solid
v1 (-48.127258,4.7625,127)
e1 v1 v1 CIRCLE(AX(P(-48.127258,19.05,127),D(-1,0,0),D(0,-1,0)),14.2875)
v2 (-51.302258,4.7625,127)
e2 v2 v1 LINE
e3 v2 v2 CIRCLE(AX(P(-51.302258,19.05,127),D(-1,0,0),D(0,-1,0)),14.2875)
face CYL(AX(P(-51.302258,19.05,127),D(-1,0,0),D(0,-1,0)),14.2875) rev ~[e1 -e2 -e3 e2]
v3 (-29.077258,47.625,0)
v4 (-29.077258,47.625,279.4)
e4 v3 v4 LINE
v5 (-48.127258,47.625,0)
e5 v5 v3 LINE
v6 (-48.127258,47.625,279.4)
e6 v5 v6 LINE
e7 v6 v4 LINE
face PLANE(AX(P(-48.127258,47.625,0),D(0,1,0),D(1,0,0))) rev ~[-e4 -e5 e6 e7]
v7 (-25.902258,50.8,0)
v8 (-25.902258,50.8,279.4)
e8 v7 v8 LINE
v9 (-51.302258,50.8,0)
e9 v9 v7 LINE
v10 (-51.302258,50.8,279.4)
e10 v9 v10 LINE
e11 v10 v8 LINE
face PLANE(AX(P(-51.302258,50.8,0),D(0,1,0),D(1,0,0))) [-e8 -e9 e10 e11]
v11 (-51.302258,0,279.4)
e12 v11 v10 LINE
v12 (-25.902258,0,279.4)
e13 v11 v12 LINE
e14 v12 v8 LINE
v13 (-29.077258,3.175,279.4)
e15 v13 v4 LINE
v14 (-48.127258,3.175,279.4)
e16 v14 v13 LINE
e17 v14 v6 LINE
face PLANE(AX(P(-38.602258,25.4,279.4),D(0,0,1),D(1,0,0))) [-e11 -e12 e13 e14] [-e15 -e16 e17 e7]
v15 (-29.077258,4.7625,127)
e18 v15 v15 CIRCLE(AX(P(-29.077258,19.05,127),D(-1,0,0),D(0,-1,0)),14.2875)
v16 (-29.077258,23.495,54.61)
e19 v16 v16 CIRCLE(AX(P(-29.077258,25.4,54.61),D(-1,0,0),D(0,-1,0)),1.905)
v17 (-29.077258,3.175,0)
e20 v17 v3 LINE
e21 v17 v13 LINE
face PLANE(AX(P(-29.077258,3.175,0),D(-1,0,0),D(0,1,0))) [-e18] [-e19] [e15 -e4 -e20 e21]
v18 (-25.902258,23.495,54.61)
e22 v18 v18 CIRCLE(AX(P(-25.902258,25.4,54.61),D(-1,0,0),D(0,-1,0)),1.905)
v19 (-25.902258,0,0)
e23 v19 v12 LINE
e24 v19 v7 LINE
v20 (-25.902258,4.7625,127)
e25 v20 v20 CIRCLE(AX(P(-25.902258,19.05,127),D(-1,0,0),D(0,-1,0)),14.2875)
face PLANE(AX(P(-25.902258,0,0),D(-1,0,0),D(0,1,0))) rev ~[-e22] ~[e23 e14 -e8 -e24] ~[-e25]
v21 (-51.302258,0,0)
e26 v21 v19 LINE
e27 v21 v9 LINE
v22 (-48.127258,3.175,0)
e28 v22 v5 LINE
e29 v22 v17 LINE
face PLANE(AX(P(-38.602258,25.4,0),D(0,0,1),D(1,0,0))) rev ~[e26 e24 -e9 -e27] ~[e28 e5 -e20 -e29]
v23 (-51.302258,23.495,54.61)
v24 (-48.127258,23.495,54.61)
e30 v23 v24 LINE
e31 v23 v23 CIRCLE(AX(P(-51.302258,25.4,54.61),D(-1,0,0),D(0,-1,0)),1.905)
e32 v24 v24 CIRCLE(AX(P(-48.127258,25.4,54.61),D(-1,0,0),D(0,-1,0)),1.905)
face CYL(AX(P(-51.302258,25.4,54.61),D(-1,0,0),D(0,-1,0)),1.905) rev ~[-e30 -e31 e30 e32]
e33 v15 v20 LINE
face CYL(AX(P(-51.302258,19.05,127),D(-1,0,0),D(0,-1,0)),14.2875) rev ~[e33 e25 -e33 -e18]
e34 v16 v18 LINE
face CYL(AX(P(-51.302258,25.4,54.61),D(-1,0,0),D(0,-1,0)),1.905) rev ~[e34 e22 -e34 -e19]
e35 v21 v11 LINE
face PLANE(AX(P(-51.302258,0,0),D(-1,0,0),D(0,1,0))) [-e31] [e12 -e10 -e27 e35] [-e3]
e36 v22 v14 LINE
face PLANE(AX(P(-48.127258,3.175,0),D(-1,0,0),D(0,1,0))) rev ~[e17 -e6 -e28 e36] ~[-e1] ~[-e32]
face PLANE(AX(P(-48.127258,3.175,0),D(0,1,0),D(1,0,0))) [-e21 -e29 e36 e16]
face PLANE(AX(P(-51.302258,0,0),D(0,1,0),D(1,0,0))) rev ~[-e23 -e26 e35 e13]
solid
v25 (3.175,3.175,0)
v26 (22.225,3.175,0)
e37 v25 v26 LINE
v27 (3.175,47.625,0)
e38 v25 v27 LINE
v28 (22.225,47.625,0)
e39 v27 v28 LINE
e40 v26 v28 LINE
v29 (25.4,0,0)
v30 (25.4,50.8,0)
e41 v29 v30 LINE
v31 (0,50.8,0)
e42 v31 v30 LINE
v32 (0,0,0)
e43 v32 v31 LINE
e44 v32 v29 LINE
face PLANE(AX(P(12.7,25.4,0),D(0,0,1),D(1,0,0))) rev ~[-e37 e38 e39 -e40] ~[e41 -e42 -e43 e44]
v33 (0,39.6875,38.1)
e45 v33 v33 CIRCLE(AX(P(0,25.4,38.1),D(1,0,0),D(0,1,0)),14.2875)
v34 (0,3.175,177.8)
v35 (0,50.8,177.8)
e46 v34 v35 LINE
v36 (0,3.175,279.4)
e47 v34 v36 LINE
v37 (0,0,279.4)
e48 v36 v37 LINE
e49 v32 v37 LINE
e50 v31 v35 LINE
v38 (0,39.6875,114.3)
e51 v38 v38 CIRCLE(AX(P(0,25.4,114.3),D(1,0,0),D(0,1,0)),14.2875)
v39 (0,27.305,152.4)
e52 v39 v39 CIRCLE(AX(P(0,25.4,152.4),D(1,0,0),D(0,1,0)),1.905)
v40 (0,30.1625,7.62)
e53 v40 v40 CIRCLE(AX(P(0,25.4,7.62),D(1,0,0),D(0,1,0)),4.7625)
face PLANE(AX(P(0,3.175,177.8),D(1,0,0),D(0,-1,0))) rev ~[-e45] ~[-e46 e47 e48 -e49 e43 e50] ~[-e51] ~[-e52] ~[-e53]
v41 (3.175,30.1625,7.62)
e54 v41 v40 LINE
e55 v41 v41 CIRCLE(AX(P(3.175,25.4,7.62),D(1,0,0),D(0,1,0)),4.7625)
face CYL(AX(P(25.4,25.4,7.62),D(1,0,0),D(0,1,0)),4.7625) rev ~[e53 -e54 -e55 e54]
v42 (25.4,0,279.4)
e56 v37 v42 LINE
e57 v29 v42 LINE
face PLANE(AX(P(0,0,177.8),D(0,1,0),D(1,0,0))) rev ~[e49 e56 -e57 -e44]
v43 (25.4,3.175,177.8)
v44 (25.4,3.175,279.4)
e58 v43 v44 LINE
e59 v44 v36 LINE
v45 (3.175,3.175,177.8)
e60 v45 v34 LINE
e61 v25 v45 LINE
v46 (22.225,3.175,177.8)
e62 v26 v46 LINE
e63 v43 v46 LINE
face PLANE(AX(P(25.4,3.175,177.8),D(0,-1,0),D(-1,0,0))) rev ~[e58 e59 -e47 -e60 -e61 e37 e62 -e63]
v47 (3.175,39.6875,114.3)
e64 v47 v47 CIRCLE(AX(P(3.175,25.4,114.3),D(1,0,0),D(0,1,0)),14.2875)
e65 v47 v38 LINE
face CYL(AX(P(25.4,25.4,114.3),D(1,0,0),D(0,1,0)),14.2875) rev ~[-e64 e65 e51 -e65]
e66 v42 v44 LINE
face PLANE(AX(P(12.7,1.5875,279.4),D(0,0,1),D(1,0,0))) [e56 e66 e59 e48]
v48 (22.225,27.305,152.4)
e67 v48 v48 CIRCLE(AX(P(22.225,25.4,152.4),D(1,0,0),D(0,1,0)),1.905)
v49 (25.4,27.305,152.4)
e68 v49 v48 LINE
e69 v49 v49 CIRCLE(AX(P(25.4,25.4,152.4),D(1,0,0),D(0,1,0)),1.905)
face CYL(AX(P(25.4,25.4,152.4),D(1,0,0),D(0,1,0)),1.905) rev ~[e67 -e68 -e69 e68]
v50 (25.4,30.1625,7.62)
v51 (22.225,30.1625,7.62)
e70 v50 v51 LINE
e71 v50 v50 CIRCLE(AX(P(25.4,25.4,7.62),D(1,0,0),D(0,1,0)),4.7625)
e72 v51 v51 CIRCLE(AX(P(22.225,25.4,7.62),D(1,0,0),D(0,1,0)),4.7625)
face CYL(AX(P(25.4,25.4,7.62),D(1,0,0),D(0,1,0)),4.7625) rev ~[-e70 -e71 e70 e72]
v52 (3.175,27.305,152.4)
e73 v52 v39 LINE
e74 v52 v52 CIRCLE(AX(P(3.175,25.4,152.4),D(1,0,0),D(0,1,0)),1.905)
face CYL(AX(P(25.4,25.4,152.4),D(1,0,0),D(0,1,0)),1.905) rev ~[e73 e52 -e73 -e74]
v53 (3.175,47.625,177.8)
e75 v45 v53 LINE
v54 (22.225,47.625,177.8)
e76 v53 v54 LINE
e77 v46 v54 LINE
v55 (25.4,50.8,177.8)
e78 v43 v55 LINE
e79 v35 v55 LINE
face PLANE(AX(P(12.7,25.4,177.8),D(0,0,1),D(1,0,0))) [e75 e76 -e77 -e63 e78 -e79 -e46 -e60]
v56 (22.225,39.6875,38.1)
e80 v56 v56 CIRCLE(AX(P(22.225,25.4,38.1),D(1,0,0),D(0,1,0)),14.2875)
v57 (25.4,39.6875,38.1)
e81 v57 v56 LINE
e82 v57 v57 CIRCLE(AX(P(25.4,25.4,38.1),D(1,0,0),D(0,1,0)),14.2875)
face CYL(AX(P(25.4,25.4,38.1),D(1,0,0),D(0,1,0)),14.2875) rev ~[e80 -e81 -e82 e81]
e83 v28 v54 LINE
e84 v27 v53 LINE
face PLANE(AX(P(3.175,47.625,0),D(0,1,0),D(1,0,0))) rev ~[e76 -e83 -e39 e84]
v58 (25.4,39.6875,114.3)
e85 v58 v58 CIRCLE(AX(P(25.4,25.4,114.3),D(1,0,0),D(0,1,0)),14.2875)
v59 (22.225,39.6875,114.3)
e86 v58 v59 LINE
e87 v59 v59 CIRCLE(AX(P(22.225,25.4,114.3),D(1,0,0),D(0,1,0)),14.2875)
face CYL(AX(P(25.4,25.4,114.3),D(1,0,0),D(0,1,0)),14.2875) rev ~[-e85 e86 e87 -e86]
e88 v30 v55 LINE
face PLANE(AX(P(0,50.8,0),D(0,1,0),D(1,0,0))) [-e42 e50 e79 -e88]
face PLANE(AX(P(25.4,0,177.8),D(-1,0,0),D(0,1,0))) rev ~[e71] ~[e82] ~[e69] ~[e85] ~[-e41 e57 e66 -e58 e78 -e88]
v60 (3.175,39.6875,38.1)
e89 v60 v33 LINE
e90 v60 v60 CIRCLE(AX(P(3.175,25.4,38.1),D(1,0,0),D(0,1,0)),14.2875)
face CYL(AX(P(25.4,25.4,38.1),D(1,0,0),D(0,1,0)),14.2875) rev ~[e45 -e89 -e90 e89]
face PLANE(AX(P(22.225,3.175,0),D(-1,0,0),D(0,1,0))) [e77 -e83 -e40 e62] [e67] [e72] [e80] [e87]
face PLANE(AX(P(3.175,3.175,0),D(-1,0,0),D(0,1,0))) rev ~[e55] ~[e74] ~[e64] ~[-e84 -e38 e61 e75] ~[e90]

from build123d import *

# Parameters (mm, degrees)
F0_W      = 25.4
F0_H      = 50.8
F0_W_2    = 19.05
F0_H_2    = 44.45
F1_DEPTH  = 177.8
F2_R      = 1.905
F2_R_2    = 14.2875
F2_R_3    = 4.7625
F3_DEPTH  = 25.4
F4_W      = 25.4
F4_H      = 50.8
F4_W_2    = 19.05
F4_H_2    = 44.45
F5_DEPTH  = 279.4
F6_R      = 1.905
F7_DEPTH  = 25.4
F8_R      = 14.2875
F9_DEPTH  = 25.4
F11_DEPTH = 101.6


# Not quite as in the source:
# - a feature names something its author has since deleted; it is built from what else it names


with BuildPart() as f1:
    # F0 (on Top) → F1 (new body)
    with BuildSketch(Plane.XY):
        with Locations((12.7, 25.4)):
            Rectangle(F0_W, F0_H)
        with Locations((12.7, 25.4)):
            Rectangle(F0_W_2, F0_H_2, mode=Mode.SUBTRACT)
    extrude(amount=F1_DEPTH)

    # F2 (on face) → F3 (cut, through all)
    with BuildSketch(Plane.YZ.offset(25.4)):
        with Locations((25.4, 152.4)):
            Circle(F2_R)
        with Locations((25.4, 38.1)):
            Circle(F2_R_2)
        with Locations((25.4, 7.62)):
            Circle(F2_R_3)
        with Locations((25.4, 114.3)):
            Circle(F2_R_2)
    extrude(amount=-F3_DEPTH, mode=Mode.SUBTRACT)

    # F10 (on face) → F11 (join)
    with BuildSketch(Plane.XY.offset(177.8)):
        Polygon((0, 3.175), (0, 0), (25.4, 0), (25.4, 3.175), (22.225, 3.175), (3.175, 3.175), align=None)
    extrude(amount=F11_DEPTH)


with BuildPart() as f5:
    # F4 (on Top) → F5 (new body)
    with BuildSketch(Plane.XY):
        with Locations((-38.6022577927, 25.4)):
            Rectangle(F4_W, F4_H)
        with Locations((-38.6022577927, 25.4)):
            Rectangle(F4_W_2, F4_H_2, mode=Mode.SUBTRACT)
    extrude(amount=F5_DEPTH)

    # F6 (on face) → F7 (cut, through all)
    with BuildSketch(Plane(origin=(-51.3022577927, 0, 0), x_dir=(0, -1, 0), z_dir=(-1, 0, 0))):
        with Locations((-25.4, 54.61)):
            Circle(F6_R)
    extrude(amount=-F7_DEPTH, mode=Mode.SUBTRACT)

    # F8 (on face) → F9 (cut, through all)
    with BuildSketch(Plane(origin=(-51.3022577927, 0, 0), x_dir=(0, -1, 0), z_dir=(-1, 0, 0))):
        with Locations((-19.05, 127)):
            Circle(F8_R)
    extrude(amount=-F9_DEPTH, mode=Mode.SUBTRACT)


solid = Compound([f1.part, f5.part])
